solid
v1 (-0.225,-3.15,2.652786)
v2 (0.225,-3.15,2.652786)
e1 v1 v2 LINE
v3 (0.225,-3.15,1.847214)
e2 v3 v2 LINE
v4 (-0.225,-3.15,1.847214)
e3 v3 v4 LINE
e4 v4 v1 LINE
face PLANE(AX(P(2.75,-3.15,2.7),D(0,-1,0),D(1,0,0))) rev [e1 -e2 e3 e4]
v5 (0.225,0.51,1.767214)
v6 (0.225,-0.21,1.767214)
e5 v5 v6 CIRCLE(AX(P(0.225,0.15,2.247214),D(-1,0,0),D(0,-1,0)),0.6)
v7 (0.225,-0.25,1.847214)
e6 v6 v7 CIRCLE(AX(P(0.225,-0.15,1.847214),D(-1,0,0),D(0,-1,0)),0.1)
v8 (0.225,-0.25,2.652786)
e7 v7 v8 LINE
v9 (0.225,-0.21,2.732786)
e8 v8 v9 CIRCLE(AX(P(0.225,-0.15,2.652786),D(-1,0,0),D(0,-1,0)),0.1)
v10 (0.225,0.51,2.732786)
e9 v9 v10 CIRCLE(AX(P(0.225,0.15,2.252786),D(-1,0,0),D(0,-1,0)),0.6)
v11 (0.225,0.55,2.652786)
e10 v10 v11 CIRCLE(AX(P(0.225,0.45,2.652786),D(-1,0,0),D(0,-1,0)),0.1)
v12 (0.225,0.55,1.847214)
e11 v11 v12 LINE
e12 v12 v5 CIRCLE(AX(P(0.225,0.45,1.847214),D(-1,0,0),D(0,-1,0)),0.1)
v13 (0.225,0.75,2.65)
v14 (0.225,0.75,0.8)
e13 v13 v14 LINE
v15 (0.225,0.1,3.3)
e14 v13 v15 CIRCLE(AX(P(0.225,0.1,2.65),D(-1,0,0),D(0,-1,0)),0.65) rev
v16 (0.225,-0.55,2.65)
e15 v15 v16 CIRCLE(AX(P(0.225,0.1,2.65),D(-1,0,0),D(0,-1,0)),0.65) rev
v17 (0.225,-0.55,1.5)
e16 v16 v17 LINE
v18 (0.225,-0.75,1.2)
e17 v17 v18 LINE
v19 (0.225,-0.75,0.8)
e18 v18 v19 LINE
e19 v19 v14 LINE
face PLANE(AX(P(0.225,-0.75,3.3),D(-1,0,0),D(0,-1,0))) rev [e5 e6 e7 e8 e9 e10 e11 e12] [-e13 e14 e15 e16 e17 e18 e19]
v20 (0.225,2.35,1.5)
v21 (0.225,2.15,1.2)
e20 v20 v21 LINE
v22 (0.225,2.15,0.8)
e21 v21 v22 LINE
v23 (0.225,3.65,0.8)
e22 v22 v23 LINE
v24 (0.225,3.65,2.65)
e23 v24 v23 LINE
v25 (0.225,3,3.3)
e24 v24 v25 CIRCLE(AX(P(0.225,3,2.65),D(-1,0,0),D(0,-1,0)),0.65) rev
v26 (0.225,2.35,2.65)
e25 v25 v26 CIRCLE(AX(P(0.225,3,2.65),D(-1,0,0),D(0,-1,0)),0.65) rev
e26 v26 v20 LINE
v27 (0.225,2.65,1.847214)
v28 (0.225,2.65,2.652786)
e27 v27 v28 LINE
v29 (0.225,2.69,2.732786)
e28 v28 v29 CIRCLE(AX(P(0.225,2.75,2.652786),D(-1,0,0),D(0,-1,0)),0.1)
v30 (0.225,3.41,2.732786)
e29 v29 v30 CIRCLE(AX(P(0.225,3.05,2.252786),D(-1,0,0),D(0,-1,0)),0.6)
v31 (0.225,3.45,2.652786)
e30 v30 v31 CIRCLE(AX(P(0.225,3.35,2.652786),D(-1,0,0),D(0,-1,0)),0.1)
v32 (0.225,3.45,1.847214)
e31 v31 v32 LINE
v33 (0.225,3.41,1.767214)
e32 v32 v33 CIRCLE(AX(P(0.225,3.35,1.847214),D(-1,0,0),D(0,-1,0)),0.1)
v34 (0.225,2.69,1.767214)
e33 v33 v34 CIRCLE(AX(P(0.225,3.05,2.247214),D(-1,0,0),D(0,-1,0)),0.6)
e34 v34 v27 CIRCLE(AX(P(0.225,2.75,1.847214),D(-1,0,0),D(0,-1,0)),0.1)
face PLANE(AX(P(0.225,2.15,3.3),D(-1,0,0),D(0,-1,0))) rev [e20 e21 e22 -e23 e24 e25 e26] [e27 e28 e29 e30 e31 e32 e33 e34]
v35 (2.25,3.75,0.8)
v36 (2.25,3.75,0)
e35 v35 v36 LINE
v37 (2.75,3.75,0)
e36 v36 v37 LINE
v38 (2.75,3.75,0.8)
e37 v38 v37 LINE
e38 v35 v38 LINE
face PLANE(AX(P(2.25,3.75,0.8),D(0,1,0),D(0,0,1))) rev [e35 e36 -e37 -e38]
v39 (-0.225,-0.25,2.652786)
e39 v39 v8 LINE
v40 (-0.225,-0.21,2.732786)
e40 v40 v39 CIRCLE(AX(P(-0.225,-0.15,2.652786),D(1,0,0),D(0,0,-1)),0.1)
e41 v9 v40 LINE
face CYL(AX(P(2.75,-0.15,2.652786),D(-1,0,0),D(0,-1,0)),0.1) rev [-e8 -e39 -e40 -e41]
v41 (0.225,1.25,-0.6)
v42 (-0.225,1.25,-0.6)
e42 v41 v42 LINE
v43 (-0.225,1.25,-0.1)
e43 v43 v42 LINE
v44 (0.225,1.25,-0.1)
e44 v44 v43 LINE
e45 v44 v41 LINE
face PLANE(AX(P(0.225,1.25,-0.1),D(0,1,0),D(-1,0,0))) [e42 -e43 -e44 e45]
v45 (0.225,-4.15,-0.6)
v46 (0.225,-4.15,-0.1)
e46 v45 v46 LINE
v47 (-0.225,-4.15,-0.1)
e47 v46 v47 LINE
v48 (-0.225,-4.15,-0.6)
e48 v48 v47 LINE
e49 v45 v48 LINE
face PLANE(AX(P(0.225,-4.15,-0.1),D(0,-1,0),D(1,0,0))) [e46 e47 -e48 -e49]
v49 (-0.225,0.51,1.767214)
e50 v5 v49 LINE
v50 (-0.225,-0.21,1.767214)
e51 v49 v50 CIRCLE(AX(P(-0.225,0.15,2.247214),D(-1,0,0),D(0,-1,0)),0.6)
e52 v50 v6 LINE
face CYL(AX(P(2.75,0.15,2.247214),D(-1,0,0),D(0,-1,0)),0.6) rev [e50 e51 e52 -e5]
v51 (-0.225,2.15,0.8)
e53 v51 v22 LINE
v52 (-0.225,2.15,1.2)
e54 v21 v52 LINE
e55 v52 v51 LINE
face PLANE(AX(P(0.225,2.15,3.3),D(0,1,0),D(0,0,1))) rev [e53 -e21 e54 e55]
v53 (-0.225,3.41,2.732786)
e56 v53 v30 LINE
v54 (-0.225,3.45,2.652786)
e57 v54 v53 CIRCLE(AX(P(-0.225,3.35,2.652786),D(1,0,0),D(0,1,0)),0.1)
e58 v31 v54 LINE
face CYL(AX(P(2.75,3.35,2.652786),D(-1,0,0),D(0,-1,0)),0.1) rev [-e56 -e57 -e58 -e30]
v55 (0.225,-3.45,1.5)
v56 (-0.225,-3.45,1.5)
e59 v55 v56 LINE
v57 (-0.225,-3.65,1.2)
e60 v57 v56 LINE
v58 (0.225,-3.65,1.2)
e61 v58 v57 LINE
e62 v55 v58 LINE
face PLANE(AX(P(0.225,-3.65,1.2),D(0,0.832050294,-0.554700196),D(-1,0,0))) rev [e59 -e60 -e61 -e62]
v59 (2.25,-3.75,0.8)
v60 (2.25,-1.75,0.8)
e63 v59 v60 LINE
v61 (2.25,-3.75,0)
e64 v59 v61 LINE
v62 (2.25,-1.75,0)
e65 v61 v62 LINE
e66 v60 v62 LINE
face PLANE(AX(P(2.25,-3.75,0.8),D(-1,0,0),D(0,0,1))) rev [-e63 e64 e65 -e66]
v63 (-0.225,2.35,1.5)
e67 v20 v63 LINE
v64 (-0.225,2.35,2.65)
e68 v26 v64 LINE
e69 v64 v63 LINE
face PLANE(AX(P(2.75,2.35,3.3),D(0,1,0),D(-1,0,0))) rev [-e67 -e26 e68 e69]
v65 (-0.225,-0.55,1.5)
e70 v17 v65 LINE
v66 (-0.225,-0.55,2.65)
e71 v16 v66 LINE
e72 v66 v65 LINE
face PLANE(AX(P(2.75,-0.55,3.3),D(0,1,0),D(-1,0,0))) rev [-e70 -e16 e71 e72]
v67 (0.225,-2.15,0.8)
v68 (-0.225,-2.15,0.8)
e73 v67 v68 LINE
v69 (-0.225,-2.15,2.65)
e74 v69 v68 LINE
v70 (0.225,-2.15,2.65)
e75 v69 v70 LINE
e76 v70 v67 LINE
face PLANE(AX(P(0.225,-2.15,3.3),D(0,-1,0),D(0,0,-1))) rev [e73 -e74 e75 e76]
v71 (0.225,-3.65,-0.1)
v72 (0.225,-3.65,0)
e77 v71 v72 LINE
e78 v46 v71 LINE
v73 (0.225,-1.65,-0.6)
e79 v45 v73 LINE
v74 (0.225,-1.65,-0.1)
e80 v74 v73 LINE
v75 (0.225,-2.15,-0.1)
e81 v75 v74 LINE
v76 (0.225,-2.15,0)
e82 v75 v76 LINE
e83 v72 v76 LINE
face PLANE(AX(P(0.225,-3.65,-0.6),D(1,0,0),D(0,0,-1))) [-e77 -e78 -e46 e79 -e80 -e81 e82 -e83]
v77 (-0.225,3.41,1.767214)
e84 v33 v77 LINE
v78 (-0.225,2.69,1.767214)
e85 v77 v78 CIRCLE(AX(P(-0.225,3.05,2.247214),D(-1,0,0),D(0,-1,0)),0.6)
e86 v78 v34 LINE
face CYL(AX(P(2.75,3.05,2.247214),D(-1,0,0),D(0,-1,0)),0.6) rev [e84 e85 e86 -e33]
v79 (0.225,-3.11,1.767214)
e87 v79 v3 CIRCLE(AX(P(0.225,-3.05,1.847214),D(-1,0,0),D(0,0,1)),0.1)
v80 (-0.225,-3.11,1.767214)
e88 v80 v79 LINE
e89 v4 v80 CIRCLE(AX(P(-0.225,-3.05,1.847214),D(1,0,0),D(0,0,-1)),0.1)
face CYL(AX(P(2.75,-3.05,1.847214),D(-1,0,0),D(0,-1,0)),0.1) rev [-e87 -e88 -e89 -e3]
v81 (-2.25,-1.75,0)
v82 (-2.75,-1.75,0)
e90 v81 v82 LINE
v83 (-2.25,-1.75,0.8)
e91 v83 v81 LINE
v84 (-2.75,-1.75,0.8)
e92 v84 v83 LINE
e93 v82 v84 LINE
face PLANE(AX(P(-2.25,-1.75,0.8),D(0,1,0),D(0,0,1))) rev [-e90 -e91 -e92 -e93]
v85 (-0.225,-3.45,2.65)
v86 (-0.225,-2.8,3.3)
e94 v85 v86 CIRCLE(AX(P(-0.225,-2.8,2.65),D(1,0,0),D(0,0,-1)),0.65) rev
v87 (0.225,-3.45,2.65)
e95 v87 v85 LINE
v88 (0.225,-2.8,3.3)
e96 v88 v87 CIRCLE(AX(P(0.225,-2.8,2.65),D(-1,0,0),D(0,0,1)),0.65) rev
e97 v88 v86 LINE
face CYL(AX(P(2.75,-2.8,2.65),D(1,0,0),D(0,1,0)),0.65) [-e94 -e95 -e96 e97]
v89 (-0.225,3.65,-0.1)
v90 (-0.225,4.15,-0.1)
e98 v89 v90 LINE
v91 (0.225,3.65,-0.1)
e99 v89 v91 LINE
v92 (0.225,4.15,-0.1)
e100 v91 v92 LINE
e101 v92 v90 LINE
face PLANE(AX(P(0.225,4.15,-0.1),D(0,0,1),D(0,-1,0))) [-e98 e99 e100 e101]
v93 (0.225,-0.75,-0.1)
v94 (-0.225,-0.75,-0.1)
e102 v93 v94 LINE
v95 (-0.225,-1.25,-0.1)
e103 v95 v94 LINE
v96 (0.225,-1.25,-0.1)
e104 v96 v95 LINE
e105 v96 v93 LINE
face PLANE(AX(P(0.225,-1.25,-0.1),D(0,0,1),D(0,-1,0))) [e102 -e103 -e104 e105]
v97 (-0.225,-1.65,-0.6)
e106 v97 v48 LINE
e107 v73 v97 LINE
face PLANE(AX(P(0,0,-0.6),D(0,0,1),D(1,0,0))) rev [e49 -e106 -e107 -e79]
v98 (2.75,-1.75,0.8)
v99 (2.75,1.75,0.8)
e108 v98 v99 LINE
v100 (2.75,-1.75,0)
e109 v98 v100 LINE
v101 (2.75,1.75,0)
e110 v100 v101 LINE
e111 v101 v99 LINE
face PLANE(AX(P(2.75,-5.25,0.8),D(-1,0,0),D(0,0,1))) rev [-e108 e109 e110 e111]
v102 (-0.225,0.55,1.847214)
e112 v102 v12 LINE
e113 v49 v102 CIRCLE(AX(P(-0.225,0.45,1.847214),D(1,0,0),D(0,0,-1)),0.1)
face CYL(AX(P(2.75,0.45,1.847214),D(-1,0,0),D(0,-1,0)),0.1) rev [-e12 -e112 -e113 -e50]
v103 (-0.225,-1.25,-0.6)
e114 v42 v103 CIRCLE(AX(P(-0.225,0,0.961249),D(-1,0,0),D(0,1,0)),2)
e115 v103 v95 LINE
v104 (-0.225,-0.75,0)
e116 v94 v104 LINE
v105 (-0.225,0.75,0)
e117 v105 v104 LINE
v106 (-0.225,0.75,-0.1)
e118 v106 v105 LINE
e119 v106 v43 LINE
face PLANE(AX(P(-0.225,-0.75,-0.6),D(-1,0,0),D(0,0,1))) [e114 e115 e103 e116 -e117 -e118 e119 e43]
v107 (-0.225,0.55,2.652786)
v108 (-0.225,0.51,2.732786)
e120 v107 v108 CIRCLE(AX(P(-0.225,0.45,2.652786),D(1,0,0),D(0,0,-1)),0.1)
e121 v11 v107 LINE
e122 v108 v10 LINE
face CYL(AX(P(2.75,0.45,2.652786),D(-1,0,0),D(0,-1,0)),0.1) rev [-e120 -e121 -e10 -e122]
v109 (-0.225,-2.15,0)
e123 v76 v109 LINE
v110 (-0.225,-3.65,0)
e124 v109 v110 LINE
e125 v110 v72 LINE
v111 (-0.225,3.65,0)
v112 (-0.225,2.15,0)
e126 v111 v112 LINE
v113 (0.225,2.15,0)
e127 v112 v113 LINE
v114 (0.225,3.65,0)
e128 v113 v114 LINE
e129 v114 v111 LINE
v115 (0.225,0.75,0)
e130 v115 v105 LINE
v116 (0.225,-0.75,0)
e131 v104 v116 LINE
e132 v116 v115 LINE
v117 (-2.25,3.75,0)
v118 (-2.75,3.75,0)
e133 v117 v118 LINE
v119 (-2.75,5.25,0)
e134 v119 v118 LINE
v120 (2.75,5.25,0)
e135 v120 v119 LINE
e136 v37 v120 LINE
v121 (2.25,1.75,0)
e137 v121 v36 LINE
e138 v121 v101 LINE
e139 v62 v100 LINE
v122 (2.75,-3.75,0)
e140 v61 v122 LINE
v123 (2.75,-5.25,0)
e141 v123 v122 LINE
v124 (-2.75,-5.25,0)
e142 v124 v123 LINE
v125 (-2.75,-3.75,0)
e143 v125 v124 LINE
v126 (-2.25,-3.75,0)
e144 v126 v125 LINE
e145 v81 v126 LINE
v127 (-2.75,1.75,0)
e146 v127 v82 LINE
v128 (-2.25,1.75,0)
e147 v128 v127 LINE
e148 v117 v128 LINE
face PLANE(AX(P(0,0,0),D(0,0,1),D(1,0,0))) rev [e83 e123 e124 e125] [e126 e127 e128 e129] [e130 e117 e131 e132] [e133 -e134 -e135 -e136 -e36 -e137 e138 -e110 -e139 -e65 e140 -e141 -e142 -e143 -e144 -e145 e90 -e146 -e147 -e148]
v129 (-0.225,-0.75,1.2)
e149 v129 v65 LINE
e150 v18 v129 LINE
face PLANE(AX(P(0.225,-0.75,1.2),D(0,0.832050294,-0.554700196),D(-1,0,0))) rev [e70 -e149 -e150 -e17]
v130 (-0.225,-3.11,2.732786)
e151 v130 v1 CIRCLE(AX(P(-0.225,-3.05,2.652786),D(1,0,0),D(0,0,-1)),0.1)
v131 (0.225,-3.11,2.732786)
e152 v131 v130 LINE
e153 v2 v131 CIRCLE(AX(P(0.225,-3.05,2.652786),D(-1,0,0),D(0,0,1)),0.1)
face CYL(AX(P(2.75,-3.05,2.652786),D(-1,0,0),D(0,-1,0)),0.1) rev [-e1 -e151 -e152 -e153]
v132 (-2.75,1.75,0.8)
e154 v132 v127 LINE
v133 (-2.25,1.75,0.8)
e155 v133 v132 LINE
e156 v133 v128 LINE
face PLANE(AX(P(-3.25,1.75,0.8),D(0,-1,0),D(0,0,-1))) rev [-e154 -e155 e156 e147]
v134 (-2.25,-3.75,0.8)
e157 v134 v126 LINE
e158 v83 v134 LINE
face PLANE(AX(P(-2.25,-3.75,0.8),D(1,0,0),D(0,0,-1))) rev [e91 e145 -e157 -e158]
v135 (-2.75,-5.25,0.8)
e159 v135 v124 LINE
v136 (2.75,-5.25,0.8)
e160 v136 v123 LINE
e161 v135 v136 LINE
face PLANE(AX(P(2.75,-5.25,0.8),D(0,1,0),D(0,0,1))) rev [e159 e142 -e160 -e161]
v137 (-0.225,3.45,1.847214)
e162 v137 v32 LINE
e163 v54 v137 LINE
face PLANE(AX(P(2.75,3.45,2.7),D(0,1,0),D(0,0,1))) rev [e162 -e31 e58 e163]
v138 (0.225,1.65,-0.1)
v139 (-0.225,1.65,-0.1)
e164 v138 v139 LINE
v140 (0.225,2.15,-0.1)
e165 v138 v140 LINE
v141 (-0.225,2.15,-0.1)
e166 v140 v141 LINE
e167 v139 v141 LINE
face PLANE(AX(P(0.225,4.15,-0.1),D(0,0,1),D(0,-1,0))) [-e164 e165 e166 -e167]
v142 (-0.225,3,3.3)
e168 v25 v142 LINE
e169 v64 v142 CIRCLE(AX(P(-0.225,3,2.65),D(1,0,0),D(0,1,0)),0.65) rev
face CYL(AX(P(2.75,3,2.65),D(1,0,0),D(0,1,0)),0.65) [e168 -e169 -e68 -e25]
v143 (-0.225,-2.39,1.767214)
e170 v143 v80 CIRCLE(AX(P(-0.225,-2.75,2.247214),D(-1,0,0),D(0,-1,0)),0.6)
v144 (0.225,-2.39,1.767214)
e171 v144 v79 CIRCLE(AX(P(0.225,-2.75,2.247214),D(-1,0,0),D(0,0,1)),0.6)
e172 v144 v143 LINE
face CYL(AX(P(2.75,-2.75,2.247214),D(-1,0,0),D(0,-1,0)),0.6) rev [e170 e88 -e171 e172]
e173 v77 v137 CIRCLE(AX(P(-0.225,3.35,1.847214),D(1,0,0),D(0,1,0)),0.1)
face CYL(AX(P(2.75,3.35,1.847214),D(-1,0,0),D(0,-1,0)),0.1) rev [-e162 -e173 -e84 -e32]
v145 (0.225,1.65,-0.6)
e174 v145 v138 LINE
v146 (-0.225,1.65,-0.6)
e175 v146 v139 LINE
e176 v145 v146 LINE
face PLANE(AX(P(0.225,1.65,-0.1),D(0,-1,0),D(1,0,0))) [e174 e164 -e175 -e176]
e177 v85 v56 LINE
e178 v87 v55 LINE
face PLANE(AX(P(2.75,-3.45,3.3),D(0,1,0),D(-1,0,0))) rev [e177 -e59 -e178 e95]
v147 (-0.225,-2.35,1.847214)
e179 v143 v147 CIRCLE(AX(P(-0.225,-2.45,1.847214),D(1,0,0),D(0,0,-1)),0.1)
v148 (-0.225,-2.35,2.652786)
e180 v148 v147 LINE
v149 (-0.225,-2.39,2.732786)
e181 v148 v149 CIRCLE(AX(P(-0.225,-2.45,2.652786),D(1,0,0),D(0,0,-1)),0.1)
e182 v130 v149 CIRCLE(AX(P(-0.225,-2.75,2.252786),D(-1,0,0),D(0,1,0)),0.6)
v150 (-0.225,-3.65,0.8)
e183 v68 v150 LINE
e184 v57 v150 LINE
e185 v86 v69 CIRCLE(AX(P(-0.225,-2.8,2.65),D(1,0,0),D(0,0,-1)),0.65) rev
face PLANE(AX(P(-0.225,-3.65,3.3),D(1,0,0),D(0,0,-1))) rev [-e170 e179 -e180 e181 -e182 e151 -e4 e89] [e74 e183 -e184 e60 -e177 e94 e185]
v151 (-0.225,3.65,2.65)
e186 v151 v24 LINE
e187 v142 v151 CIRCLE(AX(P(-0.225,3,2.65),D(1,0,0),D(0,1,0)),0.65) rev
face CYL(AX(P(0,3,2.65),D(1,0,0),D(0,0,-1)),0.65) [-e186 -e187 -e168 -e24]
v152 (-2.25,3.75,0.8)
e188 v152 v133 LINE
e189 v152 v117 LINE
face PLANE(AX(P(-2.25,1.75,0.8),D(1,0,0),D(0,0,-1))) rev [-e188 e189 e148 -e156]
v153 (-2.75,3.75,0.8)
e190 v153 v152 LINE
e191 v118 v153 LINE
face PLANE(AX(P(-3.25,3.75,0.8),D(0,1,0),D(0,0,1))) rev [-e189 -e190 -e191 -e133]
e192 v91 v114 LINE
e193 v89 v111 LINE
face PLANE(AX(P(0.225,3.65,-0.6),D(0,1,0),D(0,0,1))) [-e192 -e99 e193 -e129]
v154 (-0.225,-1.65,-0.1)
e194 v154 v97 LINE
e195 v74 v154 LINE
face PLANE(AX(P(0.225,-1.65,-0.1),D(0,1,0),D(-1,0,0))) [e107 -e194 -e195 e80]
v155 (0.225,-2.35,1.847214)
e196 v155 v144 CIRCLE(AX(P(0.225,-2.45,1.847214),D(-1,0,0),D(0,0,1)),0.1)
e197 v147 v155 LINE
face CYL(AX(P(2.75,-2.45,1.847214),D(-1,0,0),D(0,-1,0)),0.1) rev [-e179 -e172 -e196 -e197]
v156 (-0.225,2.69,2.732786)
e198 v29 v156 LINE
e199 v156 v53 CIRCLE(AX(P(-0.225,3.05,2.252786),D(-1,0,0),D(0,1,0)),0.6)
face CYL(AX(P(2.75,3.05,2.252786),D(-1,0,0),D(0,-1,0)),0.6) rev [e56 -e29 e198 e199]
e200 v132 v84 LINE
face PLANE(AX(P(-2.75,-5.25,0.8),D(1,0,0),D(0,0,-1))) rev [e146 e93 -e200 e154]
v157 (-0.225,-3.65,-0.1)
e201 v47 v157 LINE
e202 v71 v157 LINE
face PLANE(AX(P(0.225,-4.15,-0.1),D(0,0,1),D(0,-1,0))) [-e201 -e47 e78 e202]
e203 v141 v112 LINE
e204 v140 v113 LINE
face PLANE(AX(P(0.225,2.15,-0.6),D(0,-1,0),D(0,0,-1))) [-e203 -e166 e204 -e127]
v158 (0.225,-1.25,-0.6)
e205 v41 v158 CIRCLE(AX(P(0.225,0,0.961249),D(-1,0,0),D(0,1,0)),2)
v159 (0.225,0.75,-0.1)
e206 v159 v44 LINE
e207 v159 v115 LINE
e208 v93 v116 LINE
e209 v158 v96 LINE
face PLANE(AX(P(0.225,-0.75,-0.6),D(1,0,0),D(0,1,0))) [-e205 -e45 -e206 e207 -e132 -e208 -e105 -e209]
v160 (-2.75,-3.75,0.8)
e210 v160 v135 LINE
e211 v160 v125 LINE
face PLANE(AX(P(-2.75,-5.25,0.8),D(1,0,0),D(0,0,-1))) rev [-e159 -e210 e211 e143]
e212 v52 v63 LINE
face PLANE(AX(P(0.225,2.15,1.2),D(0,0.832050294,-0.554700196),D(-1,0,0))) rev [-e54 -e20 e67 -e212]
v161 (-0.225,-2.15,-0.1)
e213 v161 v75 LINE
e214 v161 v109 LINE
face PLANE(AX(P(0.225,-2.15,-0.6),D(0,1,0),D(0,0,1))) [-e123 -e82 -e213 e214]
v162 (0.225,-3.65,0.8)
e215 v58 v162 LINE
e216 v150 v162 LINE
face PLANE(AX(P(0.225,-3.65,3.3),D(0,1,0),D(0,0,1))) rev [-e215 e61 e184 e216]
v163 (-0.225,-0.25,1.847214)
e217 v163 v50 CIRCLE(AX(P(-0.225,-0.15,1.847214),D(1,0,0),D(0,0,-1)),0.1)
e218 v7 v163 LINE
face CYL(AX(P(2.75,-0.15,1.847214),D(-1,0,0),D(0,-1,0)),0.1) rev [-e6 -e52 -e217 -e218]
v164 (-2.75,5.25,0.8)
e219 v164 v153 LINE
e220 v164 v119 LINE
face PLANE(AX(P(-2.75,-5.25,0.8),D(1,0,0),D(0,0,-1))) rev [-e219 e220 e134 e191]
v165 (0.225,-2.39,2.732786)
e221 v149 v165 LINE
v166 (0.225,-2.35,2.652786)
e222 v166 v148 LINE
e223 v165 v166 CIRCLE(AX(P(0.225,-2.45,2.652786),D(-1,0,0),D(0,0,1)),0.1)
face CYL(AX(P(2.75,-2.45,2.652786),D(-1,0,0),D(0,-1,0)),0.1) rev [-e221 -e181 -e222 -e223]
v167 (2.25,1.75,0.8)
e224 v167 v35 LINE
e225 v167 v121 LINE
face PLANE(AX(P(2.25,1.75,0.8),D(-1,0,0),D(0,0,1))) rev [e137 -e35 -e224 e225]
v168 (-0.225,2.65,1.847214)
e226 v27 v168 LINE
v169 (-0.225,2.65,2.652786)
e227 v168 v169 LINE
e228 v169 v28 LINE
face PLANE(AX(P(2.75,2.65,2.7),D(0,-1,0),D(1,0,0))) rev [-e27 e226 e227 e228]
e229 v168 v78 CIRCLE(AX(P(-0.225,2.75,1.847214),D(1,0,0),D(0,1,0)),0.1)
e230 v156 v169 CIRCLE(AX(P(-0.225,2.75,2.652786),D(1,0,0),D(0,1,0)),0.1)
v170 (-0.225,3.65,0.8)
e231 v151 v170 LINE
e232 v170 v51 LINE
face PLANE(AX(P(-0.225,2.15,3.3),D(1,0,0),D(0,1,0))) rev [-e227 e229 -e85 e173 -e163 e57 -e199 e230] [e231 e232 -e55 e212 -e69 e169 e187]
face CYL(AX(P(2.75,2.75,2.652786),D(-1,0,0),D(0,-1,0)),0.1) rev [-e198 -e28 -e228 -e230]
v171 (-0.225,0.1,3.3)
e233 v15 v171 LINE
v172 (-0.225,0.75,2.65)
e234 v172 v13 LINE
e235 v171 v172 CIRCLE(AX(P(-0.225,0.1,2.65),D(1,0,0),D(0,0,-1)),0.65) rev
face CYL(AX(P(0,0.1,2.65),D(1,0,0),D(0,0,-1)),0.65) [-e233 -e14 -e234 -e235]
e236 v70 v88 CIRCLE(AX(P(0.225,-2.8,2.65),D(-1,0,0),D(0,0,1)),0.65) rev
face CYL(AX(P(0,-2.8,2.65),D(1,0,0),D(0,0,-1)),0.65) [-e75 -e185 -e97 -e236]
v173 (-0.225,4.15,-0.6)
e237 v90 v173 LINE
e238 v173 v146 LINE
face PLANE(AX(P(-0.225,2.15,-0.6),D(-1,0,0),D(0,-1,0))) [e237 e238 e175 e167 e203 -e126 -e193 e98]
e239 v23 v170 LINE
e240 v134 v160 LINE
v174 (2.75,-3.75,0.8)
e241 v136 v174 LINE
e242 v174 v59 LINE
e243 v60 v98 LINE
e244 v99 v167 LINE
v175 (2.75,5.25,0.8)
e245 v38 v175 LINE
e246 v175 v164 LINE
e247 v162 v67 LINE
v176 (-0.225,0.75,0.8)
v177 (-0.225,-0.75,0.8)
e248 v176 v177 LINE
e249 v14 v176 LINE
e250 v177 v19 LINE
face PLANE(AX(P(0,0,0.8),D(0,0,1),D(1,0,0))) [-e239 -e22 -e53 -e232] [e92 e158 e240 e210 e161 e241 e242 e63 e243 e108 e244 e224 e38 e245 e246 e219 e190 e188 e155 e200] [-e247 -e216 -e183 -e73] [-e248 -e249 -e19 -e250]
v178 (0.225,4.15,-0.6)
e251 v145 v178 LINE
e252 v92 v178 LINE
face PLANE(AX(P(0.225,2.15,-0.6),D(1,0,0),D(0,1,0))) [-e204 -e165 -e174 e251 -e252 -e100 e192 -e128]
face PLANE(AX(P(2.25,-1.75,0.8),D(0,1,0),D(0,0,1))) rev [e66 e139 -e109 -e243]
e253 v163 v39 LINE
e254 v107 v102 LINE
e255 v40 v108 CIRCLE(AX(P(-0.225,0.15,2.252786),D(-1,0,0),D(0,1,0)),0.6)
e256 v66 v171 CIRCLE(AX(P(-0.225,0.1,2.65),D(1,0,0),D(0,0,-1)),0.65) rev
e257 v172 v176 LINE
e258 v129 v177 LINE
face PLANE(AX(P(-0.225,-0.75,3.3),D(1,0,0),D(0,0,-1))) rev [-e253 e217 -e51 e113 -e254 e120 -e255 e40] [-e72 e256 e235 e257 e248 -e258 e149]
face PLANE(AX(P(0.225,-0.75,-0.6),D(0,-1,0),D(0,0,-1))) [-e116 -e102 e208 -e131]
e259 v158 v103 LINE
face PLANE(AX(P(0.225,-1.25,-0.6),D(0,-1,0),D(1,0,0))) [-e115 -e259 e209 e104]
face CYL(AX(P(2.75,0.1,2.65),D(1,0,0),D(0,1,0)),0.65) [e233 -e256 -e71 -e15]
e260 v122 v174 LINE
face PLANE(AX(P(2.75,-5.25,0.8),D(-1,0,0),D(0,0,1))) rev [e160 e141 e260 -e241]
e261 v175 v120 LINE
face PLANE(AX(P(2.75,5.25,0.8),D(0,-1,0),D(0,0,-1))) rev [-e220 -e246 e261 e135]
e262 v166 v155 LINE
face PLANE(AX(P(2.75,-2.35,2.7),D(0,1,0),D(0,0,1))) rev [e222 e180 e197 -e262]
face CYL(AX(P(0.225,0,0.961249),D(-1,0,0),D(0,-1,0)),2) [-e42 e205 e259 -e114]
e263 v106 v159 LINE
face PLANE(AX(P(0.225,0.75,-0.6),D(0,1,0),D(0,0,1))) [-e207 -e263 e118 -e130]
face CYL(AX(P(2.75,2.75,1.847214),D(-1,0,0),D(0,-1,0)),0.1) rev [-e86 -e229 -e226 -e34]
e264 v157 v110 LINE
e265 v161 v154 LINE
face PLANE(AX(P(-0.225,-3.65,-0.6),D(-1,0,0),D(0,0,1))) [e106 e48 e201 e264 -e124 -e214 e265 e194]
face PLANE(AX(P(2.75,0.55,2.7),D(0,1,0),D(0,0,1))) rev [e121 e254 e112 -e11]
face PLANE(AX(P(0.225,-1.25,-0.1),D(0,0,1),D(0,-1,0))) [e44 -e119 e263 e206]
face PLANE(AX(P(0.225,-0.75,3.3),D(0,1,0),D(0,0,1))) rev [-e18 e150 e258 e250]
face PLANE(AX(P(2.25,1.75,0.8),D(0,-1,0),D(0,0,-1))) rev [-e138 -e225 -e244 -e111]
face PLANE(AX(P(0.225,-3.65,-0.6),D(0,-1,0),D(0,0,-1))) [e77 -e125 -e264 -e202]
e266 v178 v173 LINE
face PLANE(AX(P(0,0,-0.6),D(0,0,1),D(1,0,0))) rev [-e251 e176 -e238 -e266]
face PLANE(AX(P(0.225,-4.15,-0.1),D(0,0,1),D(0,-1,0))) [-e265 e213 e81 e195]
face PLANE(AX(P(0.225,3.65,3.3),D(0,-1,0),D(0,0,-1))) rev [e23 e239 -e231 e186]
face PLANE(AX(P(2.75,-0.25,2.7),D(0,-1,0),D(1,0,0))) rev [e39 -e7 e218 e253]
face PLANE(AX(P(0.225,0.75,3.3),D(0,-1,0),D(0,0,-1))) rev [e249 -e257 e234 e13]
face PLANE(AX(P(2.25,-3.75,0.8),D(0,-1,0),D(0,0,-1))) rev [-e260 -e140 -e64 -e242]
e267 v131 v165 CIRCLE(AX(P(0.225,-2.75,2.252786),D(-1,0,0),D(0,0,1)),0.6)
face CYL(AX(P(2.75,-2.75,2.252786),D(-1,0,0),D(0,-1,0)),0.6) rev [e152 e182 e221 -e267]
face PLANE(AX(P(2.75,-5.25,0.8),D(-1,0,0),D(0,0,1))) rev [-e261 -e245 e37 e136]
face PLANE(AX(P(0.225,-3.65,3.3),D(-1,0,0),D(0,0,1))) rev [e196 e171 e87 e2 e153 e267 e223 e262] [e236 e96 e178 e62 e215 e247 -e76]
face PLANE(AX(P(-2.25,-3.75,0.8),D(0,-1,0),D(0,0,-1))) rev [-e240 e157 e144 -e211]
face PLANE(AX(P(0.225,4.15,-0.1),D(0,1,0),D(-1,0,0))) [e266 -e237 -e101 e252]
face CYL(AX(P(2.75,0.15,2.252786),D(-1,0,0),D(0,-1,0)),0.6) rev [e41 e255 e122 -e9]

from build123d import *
from OCP.BRepFilletAPI import BRepFilletAPI_MakeChamfer

# Parameters (mm, degrees)
SKETCH_1_W                     = 5.5
SKETCH_1_H                     = 10.5
EXTRUDE_1_DEPTH                = 0.8
SKETCH_2_W                     = 1
SKETCH_2_H                     = 2
CUT_EXTRUDE_1_DEPTH            = 6.980384603
SKETCH_3_W                     = 0.45
SKETCH_3_H                     = 1.5
EXTRUDE_2_DEPTH                = 2.5
SKETCH_5_W                     = 1.8
SKETCH_5_H                     = 0.2
CUT_EXTRUDE_2_DEPTH            = 7.877726732
FILLET_5_R                     = 0.65
CHAMFER_1_SIZE                 = 0.3
CHAMFER_1_SIZE_2               = 0.2
CUT_EXTRUDE_3_DEPTH            = 7.877726732
FILLET_6_R                     = 0.1
PATTERN_LINEAR_1_COUNT         = 3
PATTERN_LINEAR_1_PITCH         = 2.9
FILLET_6_OF_PATTERN_LINEAR_1_R = 0.1
SKETCH_3_2_W                   = 0.45
SKETCH_3_2_H                   = 1.5
EXTRUDE_3_DEPTH                = 1.4
SKETCH_8_W                     = 0.5
SKETCH_8_H                     = 2.5
EXTRUDE_4_DEPTH                = 0.45


with BuildPart() as part:
    # 草图1 → 凸台-拉伸1 (new body)
    with BuildSketch(Plane.XY):
        Rectangle(SKETCH_1_W, SKETCH_1_H)
    extrude(amount=EXTRUDE_1_DEPTH)

    # 草图2 → 切除-拉伸1 (cut, through all)
    with BuildSketch(Plane(origin=(0, 0, 0), x_dir=(-1, 0, 0), z_dir=(0, 0, -1))):
        with Locations((-2.75, 2.75)):
            Rectangle(SKETCH_2_W, SKETCH_2_H)
        with Locations((-2.75, -2.75)):
            Rectangle(SKETCH_2_W, SKETCH_2_H)
        with Locations((2.75, -2.75)):
            Rectangle(SKETCH_2_W, SKETCH_2_H)
        with Locations((2.75, 2.75)):
            Rectangle(SKETCH_2_W, SKETCH_2_H)
    extrude(amount=-CUT_EXTRUDE_1_DEPTH, mode=Mode.SUBTRACT)

    # 草图3 → 凸台-拉伸2 (add)
    with BuildSketch(Plane.XY.offset(0.8)):
        with Locations((0, 2.9)):
            Rectangle(SKETCH_3_W, SKETCH_3_H)
        Rectangle(SKETCH_3_W, SKETCH_3_H)
        with Locations((0, -2.9)):
            Rectangle(SKETCH_3_W, SKETCH_3_H)
    extrude(amount=EXTRUDE_2_DEPTH)

    # 草图5 → 切除-拉伸2 (cut, through all)
    with BuildSketch(Plane.ZY.offset(0.225)):
        with Locations((2.4, 2.25)):
            Rectangle(SKETCH_5_W, SKETCH_5_H)
        with Locations((2.4, -0.65)):
            Rectangle(SKETCH_5_W, SKETCH_5_H)
        with Locations((2.4, -3.55)):
            Rectangle(SKETCH_5_W, SKETCH_5_H)
    extrude(amount=-CUT_EXTRUDE_2_DEPTH, mode=Mode.SUBTRACT)

    # 圆角5
    fillet_5_edges = [part.edges().sort_by_distance(p)[0] for p in [
        (0, -3.45, 3.3),
        (0, -2.15, 3.3),
        (0, -0.55, 3.3),
        (0, 0.75, 3.3),
        (0, 2.35, 3.3),
        (0, 3.65, 3.3),
    ]]
    fillet(fillet_5_edges, radius=FILLET_5_R - 0.0001)  # a hair under: the kernel refuses the full size

    # 倒角1
    chamfer_1_edges_1 = [part.edges().sort_by_distance(p)[0] for p in [
        (0, 2.15, 1.5),
    ]]
    chamfer_1_side_1 = [part.faces().sort_by_distance(p)[0] for p in [
        (0, 2.15, 1.496),
    ]]
    chamfer_1_edges_2 = [part.edges().sort_by_distance(p)[0] for p in [
        (0, -0.75, 1.5),
    ]]
    chamfer_1_side_2 = [part.faces().sort_by_distance(p)[0] for p in [
        (0, -0.75, 1.496),
    ]]
    chamfer_1_edges_3 = [part.edges().sort_by_distance(p)[0] for p in [
        (0, -3.65, 1.5),
    ]]
    chamfer_1_side_3 = [part.faces().sort_by_distance(p)[0] for p in [
        (0, -3.65, 1.496),
    ]]
    chamfer_1 = BRepFilletAPI_MakeChamfer(part.part.solid().wrapped)
    for e in chamfer_1_edges_1:
        chamfer_1.Add(CHAMFER_1_SIZE - 0.0001, CHAMFER_1_SIZE_2 - 0.0001, e.wrapped, chamfer_1_side_1[0].wrapped)
    for e in chamfer_1_edges_2:
        chamfer_1.Add(CHAMFER_1_SIZE - 0.0001, CHAMFER_1_SIZE_2 - 0.0001, e.wrapped, chamfer_1_side_2[0].wrapped)
    for e in chamfer_1_edges_3:
        chamfer_1.Add(CHAMFER_1_SIZE - 0.0001, CHAMFER_1_SIZE_2 - 0.0001, e.wrapped, chamfer_1_side_3[0].wrapped)
    add(Compound.cast(chamfer_1.Shape()), mode=Mode.REPLACE)  # a hair under: the kernel refuses the full size

    # 草图6 → 切除-拉伸3 (cut, through all)
    with BuildSketch(Plane.ZY.offset(0.225)):
        with BuildLine():
            Line((2.7, 2.65), (1.8, 2.65))
            ThreePointArc((1.8, 2.65), (1.647213595, 3.05), (1.8, 3.45))
            Line((1.8, 3.45), (2.7, 3.45))
            ThreePointArc((2.7, 3.45), (2.852786405, 3.05), (2.7, 2.65))
        make_face()
    cut_extrude_3 = extrude(amount=-CUT_EXTRUDE_3_DEPTH, mode=Mode.SUBTRACT)

    # 圆角6
    fillet_6_edges = [part.edges().sort_by_distance(p)[0] for p in [
        (0, 2.65, 1.8),
        (0, 3.45, 1.8),
        (0, 3.45, 2.7),
        (0, 2.65, 2.7),
    ]]
    fillet(fillet_6_edges, radius=FILLET_6_R)

    # 阵列(线性)1: 切除-拉伸3 ×3
    with Locations(*[(0, -i * PATTERN_LINEAR_1_PITCH, 0) for i in range(1, PATTERN_LINEAR_1_COUNT)]):
        add(cut_extrude_3, mode=Mode.SUBTRACT)

    # 圆角6 of 阵列(线性)1
    fillet_6_of_pattern_linear_1_edges = [part.edges().sort_by_distance(p)[0] for p in [
        (0, -0.25, 1.8),
        (0, 0.55, 1.8),
        (0, 0.55, 2.7),
        (0, -0.25, 2.7),
        (0, -3.15, 1.8),
        (0, -2.35, 1.8),
        (0, -2.35, 2.7),
        (0, -3.15, 2.7),
    ]]
    fillet(fillet_6_of_pattern_linear_1_edges, radius=FILLET_6_OF_PATTERN_LINEAR_1_R)

    # 草图3<2> → 凸台-拉伸3 (add)
    with BuildSketch(Plane.XY.offset(0.8)):
        with Locations((0, 2.9)):
            Rectangle(SKETCH_3_2_W, SKETCH_3_2_H)
        Rectangle(SKETCH_3_2_W, SKETCH_3_2_H)
        with Locations((0, -2.9)):
            Rectangle(SKETCH_3_2_W, SKETCH_3_2_H)
    extrude(amount=-EXTRUDE_3_DEPTH)

    # 草图8 → 凸台-拉伸4 (add)
    with BuildSketch(Plane.ZY.offset(0.225)):
        with Locations((-0.35, -2.9)):
            Rectangle(SKETCH_8_W, SKETCH_8_H)
        with Locations((-0.35, 2.9)):
            Rectangle(SKETCH_8_W, SKETCH_8_H)
        with BuildLine():
            Line((-0.6, -1.25), (-0.1, -1.25))
            Line((-0.1, -1.25), (-0.1, 1.25))
            Line((-0.1, 1.25), (-0.6, 1.25))
            ThreePointArc((-0.6, 1.25), (-1.0387505, 0), (-0.6, -1.25))
        make_face()
    extrude(amount=-EXTRUDE_4_DEPTH)


solid = part.part
